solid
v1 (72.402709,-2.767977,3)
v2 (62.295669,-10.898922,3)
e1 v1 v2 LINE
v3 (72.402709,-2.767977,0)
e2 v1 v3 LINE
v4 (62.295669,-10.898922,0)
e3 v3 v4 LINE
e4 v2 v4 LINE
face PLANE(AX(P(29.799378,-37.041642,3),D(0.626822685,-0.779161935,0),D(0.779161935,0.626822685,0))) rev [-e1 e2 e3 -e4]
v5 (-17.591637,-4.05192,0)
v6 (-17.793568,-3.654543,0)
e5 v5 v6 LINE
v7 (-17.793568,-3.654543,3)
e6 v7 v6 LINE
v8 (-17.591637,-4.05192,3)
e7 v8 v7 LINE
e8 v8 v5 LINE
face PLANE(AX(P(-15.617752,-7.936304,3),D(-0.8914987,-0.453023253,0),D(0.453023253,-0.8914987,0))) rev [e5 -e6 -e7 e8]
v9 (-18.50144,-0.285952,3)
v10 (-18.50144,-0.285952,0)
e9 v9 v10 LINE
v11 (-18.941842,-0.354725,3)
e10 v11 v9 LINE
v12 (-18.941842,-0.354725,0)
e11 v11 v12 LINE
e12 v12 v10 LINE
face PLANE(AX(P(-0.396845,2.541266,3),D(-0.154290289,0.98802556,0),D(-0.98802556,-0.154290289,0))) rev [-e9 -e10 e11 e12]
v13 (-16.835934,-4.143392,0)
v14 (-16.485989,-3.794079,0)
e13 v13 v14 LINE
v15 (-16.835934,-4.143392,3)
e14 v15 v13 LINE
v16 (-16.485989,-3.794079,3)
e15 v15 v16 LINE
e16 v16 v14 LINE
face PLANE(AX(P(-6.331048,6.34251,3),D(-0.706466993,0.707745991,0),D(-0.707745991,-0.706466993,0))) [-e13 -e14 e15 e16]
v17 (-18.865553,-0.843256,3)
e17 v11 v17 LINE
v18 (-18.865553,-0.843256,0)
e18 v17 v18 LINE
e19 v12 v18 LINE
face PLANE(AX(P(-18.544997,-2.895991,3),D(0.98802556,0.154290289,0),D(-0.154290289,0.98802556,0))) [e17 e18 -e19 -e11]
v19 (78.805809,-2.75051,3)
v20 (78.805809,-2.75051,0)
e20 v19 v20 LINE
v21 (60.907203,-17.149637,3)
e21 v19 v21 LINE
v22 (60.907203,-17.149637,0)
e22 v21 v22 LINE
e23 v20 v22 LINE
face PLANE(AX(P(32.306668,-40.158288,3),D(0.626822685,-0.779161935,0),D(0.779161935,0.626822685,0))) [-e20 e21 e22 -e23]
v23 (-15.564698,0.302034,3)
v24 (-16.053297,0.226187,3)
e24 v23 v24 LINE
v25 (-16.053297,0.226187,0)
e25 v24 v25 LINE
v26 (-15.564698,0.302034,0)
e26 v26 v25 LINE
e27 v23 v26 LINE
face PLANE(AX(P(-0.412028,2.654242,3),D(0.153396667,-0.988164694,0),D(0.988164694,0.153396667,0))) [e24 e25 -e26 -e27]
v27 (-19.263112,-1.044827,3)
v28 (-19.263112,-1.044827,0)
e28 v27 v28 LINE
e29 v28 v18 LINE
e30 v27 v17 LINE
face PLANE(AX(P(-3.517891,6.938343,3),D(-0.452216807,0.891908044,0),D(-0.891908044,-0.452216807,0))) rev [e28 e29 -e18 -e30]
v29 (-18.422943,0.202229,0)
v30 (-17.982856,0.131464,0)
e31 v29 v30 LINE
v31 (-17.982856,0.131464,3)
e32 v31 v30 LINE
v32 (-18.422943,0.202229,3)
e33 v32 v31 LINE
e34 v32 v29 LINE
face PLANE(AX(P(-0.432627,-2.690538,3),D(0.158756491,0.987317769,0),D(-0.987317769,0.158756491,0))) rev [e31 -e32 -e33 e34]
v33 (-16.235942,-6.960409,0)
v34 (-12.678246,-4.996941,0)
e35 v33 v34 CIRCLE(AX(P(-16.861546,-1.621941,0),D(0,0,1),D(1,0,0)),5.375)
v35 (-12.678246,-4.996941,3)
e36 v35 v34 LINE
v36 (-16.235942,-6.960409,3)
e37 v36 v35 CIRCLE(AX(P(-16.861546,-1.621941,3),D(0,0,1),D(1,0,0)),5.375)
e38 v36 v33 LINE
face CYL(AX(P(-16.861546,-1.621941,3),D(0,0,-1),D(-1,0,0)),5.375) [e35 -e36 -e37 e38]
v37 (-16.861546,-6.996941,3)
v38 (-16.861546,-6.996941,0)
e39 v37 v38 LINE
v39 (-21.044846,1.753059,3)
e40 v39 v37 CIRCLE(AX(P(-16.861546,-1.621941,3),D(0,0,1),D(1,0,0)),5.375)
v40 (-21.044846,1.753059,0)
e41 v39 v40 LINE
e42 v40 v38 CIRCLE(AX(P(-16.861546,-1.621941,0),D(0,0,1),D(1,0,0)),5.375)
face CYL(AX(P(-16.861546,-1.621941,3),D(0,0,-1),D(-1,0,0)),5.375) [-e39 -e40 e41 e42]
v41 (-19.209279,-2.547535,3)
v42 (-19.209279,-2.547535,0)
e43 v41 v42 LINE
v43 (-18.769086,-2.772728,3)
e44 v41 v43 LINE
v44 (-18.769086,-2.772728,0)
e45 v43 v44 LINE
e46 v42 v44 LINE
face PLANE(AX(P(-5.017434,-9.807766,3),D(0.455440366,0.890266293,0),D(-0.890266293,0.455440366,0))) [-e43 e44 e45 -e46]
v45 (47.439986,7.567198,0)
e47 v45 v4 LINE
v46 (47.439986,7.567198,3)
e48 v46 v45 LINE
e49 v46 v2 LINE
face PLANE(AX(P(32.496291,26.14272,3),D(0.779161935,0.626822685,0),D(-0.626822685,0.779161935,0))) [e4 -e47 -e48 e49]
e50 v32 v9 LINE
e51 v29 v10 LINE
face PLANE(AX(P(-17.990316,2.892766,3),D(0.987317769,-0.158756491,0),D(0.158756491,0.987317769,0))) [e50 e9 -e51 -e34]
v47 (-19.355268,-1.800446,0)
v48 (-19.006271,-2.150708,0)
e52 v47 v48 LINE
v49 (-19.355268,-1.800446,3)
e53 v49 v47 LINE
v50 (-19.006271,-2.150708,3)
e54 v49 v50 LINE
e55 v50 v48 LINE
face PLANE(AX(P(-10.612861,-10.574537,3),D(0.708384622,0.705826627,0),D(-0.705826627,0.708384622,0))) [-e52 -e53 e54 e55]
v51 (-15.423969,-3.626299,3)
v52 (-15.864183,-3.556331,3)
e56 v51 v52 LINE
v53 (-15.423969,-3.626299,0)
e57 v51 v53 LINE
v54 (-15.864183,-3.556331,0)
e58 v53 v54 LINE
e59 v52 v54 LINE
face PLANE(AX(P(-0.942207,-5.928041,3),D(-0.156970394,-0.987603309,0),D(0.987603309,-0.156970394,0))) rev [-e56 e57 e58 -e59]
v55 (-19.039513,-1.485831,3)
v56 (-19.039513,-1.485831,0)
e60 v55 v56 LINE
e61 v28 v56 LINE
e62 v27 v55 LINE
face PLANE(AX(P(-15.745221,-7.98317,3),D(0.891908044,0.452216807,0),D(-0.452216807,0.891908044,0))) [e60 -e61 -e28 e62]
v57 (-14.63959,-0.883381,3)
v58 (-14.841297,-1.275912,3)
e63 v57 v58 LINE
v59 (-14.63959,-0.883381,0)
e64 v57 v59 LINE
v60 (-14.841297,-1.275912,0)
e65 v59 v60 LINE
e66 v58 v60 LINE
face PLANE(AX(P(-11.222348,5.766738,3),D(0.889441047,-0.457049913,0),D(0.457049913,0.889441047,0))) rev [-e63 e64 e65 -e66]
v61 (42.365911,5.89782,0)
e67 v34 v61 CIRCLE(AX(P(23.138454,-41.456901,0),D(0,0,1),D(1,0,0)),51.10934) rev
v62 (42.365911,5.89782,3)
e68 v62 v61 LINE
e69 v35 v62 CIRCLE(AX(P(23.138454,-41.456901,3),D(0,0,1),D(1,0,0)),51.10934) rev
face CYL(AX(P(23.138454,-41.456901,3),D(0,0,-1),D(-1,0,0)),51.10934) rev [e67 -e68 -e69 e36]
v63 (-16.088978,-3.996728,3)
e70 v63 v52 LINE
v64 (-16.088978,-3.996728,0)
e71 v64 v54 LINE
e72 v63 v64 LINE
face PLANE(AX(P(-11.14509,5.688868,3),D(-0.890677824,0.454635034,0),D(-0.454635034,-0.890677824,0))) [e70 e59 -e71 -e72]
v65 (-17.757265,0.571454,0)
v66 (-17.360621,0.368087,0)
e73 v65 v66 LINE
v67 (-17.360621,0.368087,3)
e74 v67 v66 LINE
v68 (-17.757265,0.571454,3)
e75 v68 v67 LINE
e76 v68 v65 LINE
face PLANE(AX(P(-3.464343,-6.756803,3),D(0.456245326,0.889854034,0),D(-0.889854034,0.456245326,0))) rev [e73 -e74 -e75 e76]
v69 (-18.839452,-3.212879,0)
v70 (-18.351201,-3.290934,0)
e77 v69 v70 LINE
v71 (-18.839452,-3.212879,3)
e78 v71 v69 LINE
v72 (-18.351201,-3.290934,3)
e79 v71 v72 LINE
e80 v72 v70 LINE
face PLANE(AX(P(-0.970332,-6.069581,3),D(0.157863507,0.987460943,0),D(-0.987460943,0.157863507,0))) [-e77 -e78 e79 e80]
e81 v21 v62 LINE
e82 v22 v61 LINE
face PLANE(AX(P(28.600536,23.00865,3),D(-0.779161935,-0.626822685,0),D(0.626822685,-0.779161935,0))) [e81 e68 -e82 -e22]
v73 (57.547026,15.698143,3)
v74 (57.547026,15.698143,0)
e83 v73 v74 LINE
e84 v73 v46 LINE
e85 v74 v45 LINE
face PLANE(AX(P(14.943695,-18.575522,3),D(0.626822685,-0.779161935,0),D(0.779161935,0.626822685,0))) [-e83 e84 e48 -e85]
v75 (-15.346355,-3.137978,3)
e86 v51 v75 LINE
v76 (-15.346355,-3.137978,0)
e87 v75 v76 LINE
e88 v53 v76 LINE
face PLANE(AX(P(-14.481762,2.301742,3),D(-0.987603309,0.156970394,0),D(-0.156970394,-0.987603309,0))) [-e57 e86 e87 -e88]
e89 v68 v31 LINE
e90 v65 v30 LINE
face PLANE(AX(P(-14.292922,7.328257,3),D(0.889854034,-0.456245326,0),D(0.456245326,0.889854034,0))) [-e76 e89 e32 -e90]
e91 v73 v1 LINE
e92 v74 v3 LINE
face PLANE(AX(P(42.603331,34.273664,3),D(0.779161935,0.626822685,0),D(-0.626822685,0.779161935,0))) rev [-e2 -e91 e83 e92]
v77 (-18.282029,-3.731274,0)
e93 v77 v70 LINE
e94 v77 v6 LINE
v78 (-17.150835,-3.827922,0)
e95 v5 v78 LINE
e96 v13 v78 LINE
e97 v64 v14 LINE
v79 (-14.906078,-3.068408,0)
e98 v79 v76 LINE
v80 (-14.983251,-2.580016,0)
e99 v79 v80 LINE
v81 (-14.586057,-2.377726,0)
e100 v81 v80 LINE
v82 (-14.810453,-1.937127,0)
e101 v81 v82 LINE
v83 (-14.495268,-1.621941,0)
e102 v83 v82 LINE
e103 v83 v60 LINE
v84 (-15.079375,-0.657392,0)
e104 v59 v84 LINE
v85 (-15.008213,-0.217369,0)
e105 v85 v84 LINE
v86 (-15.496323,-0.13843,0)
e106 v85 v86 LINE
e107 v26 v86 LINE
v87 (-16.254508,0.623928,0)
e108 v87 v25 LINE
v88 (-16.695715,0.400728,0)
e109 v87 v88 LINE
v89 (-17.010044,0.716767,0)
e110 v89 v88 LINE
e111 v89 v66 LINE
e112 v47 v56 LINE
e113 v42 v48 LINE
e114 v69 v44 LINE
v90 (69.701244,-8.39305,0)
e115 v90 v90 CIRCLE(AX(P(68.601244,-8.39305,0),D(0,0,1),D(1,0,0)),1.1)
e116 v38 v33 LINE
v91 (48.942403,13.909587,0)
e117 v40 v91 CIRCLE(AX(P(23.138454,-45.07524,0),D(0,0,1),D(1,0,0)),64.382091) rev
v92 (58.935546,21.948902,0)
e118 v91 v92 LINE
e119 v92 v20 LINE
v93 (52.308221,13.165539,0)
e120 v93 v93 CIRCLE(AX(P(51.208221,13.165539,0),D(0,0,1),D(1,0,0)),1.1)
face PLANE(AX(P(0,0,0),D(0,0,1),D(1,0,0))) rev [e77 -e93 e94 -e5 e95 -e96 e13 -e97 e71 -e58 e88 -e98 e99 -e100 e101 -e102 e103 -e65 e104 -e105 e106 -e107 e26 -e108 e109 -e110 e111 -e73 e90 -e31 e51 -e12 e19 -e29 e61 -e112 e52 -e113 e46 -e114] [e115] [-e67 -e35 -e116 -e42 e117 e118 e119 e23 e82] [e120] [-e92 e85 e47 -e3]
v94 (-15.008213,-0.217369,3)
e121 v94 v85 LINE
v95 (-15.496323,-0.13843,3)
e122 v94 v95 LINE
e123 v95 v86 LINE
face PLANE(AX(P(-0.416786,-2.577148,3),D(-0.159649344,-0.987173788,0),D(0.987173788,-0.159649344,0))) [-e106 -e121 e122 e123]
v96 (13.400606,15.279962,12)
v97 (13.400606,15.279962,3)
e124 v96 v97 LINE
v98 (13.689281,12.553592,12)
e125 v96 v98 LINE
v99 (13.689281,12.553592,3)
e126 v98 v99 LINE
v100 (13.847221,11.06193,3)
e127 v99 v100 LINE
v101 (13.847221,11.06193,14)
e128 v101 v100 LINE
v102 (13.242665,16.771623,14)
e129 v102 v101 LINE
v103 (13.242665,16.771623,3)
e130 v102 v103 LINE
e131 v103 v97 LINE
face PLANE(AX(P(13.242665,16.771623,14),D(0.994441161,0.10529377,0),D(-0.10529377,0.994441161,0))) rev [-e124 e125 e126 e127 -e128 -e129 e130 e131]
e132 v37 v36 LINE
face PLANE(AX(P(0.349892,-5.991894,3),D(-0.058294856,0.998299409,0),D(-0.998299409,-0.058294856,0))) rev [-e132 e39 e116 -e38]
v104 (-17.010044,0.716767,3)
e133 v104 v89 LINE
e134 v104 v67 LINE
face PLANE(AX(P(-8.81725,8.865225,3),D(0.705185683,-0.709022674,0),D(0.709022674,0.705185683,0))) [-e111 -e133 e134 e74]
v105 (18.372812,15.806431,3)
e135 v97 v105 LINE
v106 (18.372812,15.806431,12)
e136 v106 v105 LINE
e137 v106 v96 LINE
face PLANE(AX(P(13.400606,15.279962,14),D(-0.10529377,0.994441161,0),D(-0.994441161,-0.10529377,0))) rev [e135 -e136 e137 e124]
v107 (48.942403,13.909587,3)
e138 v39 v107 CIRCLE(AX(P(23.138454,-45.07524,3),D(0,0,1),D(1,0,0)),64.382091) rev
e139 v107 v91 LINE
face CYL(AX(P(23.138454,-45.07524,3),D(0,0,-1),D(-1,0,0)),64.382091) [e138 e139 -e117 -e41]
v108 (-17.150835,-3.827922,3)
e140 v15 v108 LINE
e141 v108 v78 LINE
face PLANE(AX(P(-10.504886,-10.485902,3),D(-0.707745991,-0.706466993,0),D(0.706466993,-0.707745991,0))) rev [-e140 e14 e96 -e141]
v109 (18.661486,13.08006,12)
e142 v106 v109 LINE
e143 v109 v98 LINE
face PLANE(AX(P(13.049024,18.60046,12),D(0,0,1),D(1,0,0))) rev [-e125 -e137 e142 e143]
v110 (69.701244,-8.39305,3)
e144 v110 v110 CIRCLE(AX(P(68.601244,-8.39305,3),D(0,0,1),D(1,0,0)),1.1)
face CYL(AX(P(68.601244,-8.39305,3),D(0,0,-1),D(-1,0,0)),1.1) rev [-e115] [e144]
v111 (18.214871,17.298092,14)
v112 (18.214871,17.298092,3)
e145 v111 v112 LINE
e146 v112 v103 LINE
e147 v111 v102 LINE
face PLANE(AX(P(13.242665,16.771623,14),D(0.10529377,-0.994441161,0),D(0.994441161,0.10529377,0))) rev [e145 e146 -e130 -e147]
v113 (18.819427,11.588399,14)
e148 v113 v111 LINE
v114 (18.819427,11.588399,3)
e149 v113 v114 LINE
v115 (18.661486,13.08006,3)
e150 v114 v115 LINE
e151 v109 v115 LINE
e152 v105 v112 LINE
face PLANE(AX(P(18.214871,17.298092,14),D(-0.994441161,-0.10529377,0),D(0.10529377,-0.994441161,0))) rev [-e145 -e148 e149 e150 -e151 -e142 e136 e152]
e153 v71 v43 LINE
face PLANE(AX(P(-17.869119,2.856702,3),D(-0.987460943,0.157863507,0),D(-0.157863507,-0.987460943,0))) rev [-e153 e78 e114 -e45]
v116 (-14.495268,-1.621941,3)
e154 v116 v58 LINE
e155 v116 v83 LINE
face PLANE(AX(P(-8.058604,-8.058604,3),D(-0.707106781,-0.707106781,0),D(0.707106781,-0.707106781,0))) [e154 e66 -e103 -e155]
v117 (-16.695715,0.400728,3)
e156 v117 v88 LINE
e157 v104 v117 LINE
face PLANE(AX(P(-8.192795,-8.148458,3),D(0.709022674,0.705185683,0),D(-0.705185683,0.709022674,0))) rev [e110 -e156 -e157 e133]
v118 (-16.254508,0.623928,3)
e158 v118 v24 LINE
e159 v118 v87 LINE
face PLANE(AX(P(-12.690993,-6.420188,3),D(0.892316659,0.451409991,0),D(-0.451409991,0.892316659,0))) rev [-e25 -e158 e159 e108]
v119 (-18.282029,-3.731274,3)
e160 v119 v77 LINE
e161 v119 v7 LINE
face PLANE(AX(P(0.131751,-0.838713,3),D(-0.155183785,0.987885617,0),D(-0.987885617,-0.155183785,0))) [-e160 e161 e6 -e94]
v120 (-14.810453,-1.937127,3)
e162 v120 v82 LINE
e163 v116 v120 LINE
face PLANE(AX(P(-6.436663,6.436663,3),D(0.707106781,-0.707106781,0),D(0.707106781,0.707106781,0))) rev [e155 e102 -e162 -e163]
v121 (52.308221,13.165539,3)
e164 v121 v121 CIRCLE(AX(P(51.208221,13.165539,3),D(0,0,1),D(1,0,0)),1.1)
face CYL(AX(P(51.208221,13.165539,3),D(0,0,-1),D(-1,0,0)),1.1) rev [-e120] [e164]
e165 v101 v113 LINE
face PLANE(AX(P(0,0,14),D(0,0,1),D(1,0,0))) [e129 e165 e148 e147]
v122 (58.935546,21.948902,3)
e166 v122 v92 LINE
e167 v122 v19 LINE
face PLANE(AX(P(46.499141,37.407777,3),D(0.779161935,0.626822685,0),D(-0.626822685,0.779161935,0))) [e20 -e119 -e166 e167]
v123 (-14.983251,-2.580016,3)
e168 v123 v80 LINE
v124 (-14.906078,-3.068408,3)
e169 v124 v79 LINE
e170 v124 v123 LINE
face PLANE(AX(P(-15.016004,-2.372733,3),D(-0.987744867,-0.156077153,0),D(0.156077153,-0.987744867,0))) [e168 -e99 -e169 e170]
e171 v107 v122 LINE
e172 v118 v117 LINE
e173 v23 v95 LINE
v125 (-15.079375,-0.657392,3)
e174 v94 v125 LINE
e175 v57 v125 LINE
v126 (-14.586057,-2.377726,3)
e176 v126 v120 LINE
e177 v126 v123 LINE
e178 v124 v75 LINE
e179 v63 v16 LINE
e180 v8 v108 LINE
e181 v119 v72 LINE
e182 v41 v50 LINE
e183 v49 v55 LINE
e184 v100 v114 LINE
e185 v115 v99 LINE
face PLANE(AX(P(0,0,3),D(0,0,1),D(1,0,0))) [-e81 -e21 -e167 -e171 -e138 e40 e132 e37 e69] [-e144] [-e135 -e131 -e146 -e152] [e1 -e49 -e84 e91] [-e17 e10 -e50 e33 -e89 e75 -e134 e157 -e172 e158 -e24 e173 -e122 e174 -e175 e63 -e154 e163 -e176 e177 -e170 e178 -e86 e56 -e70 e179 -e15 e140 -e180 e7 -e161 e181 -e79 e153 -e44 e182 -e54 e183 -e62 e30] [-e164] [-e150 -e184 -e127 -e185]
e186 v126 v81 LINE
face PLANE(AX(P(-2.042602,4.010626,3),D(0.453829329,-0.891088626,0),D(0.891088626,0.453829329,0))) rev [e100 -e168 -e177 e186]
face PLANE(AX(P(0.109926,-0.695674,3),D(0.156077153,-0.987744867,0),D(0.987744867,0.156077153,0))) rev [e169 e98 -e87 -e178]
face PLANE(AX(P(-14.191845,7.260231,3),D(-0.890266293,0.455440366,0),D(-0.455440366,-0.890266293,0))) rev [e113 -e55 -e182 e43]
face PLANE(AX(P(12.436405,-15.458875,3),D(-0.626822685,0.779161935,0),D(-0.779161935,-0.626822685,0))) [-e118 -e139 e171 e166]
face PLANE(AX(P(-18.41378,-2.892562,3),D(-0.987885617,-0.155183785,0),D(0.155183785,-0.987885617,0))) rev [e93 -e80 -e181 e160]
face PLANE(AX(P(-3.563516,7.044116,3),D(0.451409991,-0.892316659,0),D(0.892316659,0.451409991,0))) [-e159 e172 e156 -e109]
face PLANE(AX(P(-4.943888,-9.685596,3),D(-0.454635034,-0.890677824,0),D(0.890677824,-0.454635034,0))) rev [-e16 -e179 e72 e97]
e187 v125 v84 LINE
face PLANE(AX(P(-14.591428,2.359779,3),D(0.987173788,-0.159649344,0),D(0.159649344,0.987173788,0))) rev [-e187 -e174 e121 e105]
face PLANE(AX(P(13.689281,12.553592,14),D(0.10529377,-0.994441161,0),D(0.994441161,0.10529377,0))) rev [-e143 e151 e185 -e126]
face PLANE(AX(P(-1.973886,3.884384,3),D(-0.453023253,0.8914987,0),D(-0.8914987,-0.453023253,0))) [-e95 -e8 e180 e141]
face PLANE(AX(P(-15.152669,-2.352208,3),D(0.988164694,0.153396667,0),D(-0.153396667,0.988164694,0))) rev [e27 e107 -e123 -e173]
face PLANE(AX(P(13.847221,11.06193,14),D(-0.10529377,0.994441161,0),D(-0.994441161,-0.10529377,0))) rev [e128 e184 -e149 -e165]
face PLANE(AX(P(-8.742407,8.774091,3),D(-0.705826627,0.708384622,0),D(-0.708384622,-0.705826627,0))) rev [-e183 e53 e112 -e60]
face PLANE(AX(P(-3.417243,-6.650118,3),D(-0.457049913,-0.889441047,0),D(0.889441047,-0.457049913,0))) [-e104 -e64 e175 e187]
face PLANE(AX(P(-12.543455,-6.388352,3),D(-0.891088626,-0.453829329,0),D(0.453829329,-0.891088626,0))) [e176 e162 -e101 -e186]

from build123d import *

# Parameters (mm, degrees)
BOSS_EXTRUDE1_OUTLINE_R = 1.1
BOSS_EXTRUDE1_DEPTH     = 3
BOSS_EXTRUDE2_DEPTH     = 11
BOSS_EXTRUDE3_REACH     = 87.92
SKETCH5_W               = 5
SKETCH5_H               = 2


# Read off the part's stored shape, not the designer's step: Boss-Extrude1
with BuildPart() as part:
    # Boss-Extrude1 outline → Boss-Extrude1 (new body)
    with BuildSketch(Plane.XY):
        with BuildLine():
            Line((-16.861546239, -6.996941033), (-16.235942246, -6.960409413))
            ThreePointArc((-16.235942246, -6.960409413), (-14.264395542, -6.327834493), (-12.678246106, -4.996941033))
            ThreePointArc((-12.678246106, -4.996941033), (13.21501224, 8.679812005), (42.365911354, 5.89781951))
            Line((42.365911354, 5.89781951), (60.907203246, -17.149637471))
            Line((60.907203246, -17.149637471), (78.805808552, -2.750510239))
            Line((78.805808552, -2.750510239), (58.935546262, 21.948902186))
            Line((58.935546262, 21.948902186), (48.942403416, 13.909586673))
            ThreePointArc((48.942403416, 13.909586673), (12.120494673, 18.357071745), (-21.044846371, 1.753058967))
            ThreePointArc((-21.044846371, 1.753058967), (-21.710837424, -3.940345657), (-16.861546239, -6.996941033))
        make_face()
        Polygon((-15.008213446, -0.217369118), (-15.079375496, -0.657391661), (-14.639590345, -0.883380518), (-14.841297197, -1.275911723), (-14.495267888, -1.621941033), (-14.810453449, -1.937126594), (-14.586057014, -2.377726392), (-14.983250587, -2.580016139), (-14.906078059, -3.068407726), (-15.346355155, -3.137977509), (-15.423969348, -3.626299102), (-15.864183346, -3.556331166), (-16.088978162, -3.996727842), (-16.485988624, -3.794078961), (-16.835934444, -4.143392379), (-17.150834826, -3.827921897), (-17.591637385, -4.051919766), (-17.793567832, -3.654543407), (-18.282029013, -3.731274208), (-18.351200586, -3.290934374), (-18.839451787, -3.212878581), (-18.769085755, -2.772728041), (-19.209278949, -2.547535028), (-19.006271099, -2.150708001), (-19.355267888, -1.800446409), (-19.039512742, -1.485831463), (-19.263111863, -1.044826504), (-18.865553043, -0.843255522), (-18.941842054, -0.354725146), (-18.501439842, -0.285951839), (-18.422942512, 0.202228569), (-17.982855791, 0.131464499), (-17.757264764, 0.571453851), (-17.360621498, 0.368087198), (-17.01004442, 0.716767072), (-16.695715168, 0.400727521), (-16.254508168, 0.623927711), (-16.053296817, 0.226186755), (-15.564697645, 0.302033914), (-15.496322662, -0.138430316), align=None, mode=Mode.SUBTRACT)
        with Locations((68.60124446, -8.393050085)):
            Circle(BOSS_EXTRUDE1_OUTLINE_R, mode=Mode.SUBTRACT)
        Polygon((72.402709352, -2.767977433), (62.295668796, -10.898921739), (47.439985558, 7.567198225), (57.547026113, 15.698142531), align=None, mode=Mode.SUBTRACT)
        with Locations((51.208221203, 13.165538506)):
            Circle(BOSS_EXTRUDE1_OUTLINE_R, mode=Mode.SUBTRACT)
    extrude(amount=BOSS_EXTRUDE1_DEPTH)

    # Sketch4 → Boss-Extrude2 (add)
    with BuildSketch(Plane.XY.offset(3)):
        Polygon((13.242665436, 16.771623459), (18.214871239, 17.298092309), (18.372811894, 15.806430568), (13.40060609, 15.279961718), align=None)
        Polygon((13.847221233, 11.061929815), (18.819427036, 11.588398665), (18.661486381, 13.080060406), (13.689280578, 12.553591556), align=None)
    extrude(amount=BOSS_EXTRUDE2_DEPTH)

    # Sketch5 → Boss-Extrude3 (add, up to next)
    with BuildSketch(Plane(origin=(-1.16269721, 10.981029202, 0), x_dir=(0.994441160657232, 0.10529376995196534, 0), z_dir=(-0.10529376995196534, 0.994441160657232, 0)), mode=Mode.PRIVATE) as boss_extrude3_sk1:
        with Locations((17.434999048, -13)):
            Rectangle(SKETCH5_W, SKETCH5_H)
    boss_extrude3_tool1 = extrude(boss_extrude3_sk1.sketch, amount=BOSS_EXTRUDE3_REACH, mode=Mode.PRIVATE) - part.part
    add(boss_extrude3_tool1.solids().sort_by_distance((16.175383, 12.816826, 13))[0])


solid = part.part
